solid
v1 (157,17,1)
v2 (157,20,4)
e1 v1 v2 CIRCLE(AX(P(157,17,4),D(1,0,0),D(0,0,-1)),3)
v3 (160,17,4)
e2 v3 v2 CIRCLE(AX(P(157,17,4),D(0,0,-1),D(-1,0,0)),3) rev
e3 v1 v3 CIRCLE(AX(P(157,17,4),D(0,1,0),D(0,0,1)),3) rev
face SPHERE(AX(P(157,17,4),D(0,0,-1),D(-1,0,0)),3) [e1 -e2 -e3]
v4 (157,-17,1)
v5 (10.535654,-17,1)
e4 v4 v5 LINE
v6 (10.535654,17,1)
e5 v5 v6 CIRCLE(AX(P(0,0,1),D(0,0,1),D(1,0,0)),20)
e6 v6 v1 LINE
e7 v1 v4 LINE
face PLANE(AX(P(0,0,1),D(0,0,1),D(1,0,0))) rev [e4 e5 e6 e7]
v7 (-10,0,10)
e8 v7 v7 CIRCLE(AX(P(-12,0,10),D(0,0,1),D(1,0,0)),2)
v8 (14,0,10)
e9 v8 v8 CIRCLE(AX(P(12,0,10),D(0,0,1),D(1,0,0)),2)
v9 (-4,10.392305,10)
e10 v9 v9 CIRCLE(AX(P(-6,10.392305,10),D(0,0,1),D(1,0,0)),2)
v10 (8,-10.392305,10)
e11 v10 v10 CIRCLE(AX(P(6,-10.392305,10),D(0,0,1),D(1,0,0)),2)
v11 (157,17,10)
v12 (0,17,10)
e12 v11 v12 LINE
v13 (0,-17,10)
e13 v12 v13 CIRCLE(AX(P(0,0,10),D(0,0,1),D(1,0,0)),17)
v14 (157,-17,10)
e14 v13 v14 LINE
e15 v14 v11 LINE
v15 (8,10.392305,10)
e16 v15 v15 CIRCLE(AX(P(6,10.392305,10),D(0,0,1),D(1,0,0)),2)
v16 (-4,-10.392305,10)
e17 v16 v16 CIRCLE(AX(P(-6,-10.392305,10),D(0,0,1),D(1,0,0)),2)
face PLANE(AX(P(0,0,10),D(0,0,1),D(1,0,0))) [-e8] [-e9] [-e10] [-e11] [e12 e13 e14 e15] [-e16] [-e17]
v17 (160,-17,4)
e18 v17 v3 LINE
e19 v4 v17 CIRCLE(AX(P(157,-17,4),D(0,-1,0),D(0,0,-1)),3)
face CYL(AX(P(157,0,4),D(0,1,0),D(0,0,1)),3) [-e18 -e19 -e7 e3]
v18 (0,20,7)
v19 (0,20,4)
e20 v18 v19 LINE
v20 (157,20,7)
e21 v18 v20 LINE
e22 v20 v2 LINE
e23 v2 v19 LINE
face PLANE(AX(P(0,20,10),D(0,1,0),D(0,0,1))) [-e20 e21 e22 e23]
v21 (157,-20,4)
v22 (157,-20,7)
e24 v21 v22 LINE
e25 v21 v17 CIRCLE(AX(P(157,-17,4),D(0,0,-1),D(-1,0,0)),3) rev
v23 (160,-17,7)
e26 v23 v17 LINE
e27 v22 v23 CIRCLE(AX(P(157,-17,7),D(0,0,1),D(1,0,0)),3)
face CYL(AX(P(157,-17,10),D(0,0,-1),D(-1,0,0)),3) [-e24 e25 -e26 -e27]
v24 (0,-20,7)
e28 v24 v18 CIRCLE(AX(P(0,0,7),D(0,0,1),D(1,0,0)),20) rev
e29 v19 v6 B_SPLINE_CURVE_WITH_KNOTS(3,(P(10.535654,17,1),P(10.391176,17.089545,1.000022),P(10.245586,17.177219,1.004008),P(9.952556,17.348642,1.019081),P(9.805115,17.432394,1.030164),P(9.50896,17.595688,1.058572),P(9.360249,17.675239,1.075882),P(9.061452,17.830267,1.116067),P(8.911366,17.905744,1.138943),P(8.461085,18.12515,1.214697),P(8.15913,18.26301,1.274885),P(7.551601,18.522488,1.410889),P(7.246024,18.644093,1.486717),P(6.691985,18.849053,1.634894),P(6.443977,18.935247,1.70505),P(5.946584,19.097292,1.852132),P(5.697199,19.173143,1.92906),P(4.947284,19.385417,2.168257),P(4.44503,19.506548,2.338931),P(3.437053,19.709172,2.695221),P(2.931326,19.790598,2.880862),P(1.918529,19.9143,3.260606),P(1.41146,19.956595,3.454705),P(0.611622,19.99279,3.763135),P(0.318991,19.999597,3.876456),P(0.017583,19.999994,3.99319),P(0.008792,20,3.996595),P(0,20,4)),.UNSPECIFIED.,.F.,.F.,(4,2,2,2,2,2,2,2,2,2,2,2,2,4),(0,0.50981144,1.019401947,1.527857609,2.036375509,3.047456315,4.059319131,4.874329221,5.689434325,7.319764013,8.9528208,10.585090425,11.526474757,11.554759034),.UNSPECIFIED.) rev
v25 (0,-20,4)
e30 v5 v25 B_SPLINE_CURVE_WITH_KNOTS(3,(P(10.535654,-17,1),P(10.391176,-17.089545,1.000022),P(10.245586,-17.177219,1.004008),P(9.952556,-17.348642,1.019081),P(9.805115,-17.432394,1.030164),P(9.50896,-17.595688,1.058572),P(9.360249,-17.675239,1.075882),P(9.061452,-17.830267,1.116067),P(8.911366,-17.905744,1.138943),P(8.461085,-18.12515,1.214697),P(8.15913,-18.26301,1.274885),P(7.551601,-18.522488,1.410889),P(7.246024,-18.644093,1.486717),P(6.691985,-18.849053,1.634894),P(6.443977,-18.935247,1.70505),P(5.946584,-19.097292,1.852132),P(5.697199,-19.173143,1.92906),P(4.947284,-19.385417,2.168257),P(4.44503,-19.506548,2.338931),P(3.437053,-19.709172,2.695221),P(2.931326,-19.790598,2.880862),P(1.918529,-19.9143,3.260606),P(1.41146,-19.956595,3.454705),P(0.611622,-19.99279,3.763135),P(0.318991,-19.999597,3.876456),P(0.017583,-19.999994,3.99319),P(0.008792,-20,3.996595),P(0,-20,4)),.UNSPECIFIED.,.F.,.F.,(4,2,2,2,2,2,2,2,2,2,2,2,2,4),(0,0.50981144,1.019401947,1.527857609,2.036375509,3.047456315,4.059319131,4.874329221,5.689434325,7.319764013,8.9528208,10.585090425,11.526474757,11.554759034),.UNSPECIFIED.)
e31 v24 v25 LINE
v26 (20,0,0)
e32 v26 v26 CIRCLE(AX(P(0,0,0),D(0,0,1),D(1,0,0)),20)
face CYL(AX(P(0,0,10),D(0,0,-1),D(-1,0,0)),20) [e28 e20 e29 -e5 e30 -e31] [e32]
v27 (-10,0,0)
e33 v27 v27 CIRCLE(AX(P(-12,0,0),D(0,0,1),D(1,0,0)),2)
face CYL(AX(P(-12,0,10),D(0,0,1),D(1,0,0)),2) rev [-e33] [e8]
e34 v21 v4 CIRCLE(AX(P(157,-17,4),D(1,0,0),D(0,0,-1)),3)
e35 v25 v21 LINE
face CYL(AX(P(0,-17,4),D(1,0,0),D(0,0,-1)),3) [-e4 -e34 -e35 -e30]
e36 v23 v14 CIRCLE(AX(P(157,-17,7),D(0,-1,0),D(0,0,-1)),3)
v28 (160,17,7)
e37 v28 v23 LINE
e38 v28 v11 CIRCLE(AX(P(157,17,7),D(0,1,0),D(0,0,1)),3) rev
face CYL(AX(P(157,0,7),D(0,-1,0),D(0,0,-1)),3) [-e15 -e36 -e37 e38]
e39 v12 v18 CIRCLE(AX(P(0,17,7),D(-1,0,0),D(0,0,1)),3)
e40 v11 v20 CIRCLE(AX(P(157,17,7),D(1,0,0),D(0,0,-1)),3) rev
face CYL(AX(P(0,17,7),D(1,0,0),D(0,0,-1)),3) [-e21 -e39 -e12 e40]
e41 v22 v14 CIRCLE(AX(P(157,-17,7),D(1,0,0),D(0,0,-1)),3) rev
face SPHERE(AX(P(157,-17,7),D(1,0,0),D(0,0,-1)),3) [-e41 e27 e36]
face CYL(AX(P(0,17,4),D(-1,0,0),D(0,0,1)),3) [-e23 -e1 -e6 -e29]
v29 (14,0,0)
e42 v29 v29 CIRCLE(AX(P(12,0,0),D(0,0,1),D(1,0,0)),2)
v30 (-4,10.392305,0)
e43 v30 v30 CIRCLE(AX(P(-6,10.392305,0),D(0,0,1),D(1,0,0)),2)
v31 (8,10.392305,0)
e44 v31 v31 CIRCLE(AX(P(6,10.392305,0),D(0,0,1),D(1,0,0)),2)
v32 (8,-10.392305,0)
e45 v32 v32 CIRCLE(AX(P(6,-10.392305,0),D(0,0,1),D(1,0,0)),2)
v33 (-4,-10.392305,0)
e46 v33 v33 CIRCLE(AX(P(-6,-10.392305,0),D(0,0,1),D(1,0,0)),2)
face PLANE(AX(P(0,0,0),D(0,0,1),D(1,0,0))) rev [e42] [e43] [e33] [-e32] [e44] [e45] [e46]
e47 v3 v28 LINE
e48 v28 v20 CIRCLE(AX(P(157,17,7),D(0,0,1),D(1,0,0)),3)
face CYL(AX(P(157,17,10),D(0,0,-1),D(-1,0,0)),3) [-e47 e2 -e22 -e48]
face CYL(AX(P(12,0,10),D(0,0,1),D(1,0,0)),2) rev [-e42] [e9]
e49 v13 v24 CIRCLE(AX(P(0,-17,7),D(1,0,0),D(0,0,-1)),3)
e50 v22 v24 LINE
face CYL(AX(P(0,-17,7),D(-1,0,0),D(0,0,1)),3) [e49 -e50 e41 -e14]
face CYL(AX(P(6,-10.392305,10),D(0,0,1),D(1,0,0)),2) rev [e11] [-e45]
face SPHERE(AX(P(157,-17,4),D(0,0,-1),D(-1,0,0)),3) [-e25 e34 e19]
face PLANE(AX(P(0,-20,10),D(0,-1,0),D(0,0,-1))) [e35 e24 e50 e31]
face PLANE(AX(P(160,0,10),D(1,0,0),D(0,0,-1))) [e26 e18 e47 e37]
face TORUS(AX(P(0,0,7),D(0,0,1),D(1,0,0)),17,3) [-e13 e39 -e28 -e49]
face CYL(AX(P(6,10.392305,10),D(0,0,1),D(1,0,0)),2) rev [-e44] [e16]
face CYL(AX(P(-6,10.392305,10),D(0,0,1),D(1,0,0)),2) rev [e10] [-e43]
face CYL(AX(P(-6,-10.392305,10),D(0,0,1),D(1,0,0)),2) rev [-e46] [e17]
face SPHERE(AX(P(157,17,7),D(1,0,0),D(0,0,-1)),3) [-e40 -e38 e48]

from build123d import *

# Parameters (mm, degrees)
SKETCH8_R             = 20
BOSS_EXTRUDE6_DEPTH   = 10
BOSS_EXTRUDE7_START   = 1
BOSS_EXTRUDE7_DEPTH   = 9
F_4_0MM_DOWEL_HOLE2_D = 4
FILLET4_R             = 3


with BuildPart() as part:
    # Sketch8 → Boss-Extrude6 (new body)
    with BuildSketch(Plane.XY):
        Circle(SKETCH8_R)
    extrude(amount=BOSS_EXTRUDE6_DEPTH)

    # Sketch8<4> → Boss-Extrude7 (add)
    with BuildSketch(Plane.XY.offset(BOSS_EXTRUDE7_START)):
        with BuildLine():
            Line((160, 20), (0, 20))
            ThreePointArc((0, 20), (14.142135624, 14.142135624), (20, 0))
            ThreePointArc((20, 0), (14.142135624, -14.142135624), (0, -20))
            Line((0, -20), (160, -20))
            Line((160, -20), (160, 20))
        make_face()
    extrude(amount=BOSS_EXTRUDE7_DEPTH)

    # Ø4.0mm Dowel Hole2 (through all)
    with Locations(Plane.XY.offset(10)):
        with Locations((6, 10.392304845), (12, 0), (6, -10.392304845), (-6, -10.392304845), (-12, 0), (-6, 10.392304845)):
            Hole(F_4_0MM_DOWEL_HOLE2_D / 2)

    # Fillet4
    # the kernel refuses this fillet: 3 mm, written as the material it takes off along each edge
    with BuildSketch(Plane(origin=(157, 17, 4), x_dir=(1, 0, 0), z_dir=(0, 0, -1))) as fillet4_piece_1_section:
        Polygon((0, 0), (FILLET4_R, 0), (FILLET4_R, -FILLET4_R), (0, -FILLET4_R), align=None)
    fillet4_piece_1 = extrude(amount=FILLET4_R, mode=Mode.PRIVATE)
    fillet4_piece_1 = fillet4_piece_1 - Plane(origin=(157, 17, 4), x_dir=(-0.7071067811865475, -0.7071067811865475, 0), z_dir=(0, 0, -1)) * Sphere(FILLET4_R, mode=Mode.PRIVATE)
    add(fillet4_piece_1, mode=Mode.SUBTRACT)
    with BuildSketch(Plane(origin=(157, 17, 7), x_dir=(1, 0, 0), z_dir=(0, 0, 1))) as fillet4_piece_2_section:
        Polygon((0, 0), (FILLET4_R, 0), (FILLET4_R, FILLET4_R), (0, FILLET4_R), align=None)
    fillet4_piece_2 = extrude(amount=FILLET4_R, mode=Mode.PRIVATE)
    fillet4_piece_2 = fillet4_piece_2 - Plane(origin=(157, 17, 7), x_dir=(-0.7071067811865475, -0.7071067811865475, 0), z_dir=(0, 0, 1)) * Sphere(FILLET4_R, mode=Mode.PRIVATE)
    add(fillet4_piece_2, mode=Mode.SUBTRACT)
    with BuildSketch(Plane(origin=(157, -17, 4), x_dir=(0, -1, 0), z_dir=(0, 0, -1))) as fillet4_piece_3_section:
        Polygon((0, 0), (FILLET4_R, 0), (FILLET4_R, -FILLET4_R), (0, -FILLET4_R), align=None)
    fillet4_piece_3 = extrude(amount=FILLET4_R, mode=Mode.PRIVATE)
    fillet4_piece_3 = fillet4_piece_3 - Plane(origin=(157, -17, 4), x_dir=(-0.7071067811865475, 0.7071067811865475, 0), z_dir=(0, 0, -1)) * Sphere(FILLET4_R, mode=Mode.PRIVATE)
    add(fillet4_piece_3, mode=Mode.SUBTRACT)
    with BuildSketch(Plane(origin=(157, -17, 7), x_dir=(0, 0, 1), z_dir=(0, -1, 0))) as fillet4_piece_4_section:
        Polygon((0, 0), (FILLET4_R, 0), (FILLET4_R, -FILLET4_R), (0, -FILLET4_R), align=None)
    fillet4_piece_4 = extrude(amount=FILLET4_R, mode=Mode.PRIVATE)
    fillet4_piece_4 = fillet4_piece_4 - Plane(origin=(157, -17, 7), x_dir=(-0.7071067811865475, 0, -0.7071067811865475), z_dir=(0, -1, 0)) * Sphere(FILLET4_R, mode=Mode.PRIVATE)
    add(fillet4_piece_4, mode=Mode.SUBTRACT)
    with BuildSketch(Plane(origin=(160, 20, 4), x_dir=(-1, 0, 0), z_dir=(0, 0, 1))) as fillet4_piece_5:
        with BuildLine():
            CenterArc((FILLET4_R, FILLET4_R), FILLET4_R, 180, 90)
            Line((0, FILLET4_R), (0, 0))
            Line((0, 0), (FILLET4_R, 0))
        make_face()
    extrude(amount=3, mode=Mode.SUBTRACT)
    with BuildSketch(Plane(origin=(157, 20, 1), x_dir=(0, -1, 0), z_dir=(-1, 0, 0))) as fillet4_piece_6_section:
        with BuildLine():
            CenterArc((FILLET4_R, FILLET4_R), FILLET4_R, 180, 90)
            Line((0, FILLET4_R), (0, 0))
            Line((0, 0), (FILLET4_R, 0))
        make_face()
    fillet4_piece_6 = extrude(amount=164.5, mode=Mode.PRIVATE)
    fillet4_piece_6 = fillet4_piece_6 - Plane(origin=(0, 0, 1.692410686), x_dir=(1, 0, 0), z_dir=(0, 0, -1)) * Cylinder(20, 341, mode=Mode.PRIVATE)
    add(fillet4_piece_6, mode=Mode.SUBTRACT)
    with BuildSketch(Plane(origin=(160, -17, 1), x_dir=(-1, 0, 0), z_dir=(0, 1, 0))) as fillet4_piece_7:
        with BuildLine():
            CenterArc((FILLET4_R, FILLET4_R), FILLET4_R, 180, 90)
            Line((0, FILLET4_R), (0, 0))
            Line((0, 0), (FILLET4_R, 0))
        make_face()
    extrude(amount=34, mode=Mode.SUBTRACT)
    with BuildSketch(Plane(origin=(-7.5, -20, 1), x_dir=(0, 1, 0), z_dir=(1, 0, 0))) as fillet4_piece_8_section:
        with BuildLine():
            CenterArc((FILLET4_R, FILLET4_R), FILLET4_R, 180, 90)
            Line((0, FILLET4_R), (0, 0))
            Line((0, 0), (FILLET4_R, 0))
        make_face()
    fillet4_piece_8 = extrude(amount=164.5, mode=Mode.PRIVATE)
    fillet4_piece_8 = fillet4_piece_8 - Plane(origin=(0, 0, 1.692408431), x_dir=(1, 0, 0), z_dir=(0, 0, -1)) * Cylinder(20, 341, mode=Mode.PRIVATE)
    add(fillet4_piece_8, mode=Mode.SUBTRACT)
    with BuildSketch(Plane(origin=(0, 0, 10), x_dir=(0, 1, 0), z_dir=(1, 0, 0))) as fillet4_piece_9:
        with BuildLine():
            CenterArc((20 - FILLET4_R, -FILLET4_R), FILLET4_R, 0, 90)
            Line((20 - FILLET4_R, 0), (20, 0))
            Line((20, 0), (20, -FILLET4_R))
        make_face()
    revolve(axis=Axis((0, 0, 10), (0, 0, 1)), revolution_arc=180, mode=Mode.SUBTRACT)
    with BuildSketch(Plane(origin=(0, -20, 10), x_dir=(0, 0, -1), z_dir=(1, 0, 0))) as fillet4_piece_10:
        with BuildLine():
            CenterArc((FILLET4_R, FILLET4_R), FILLET4_R, 180, 90)
            Line((0, FILLET4_R), (0, 0))
            Line((0, 0), (FILLET4_R, 0))
        make_face()
    extrude(amount=157, mode=Mode.SUBTRACT)
    with BuildSketch(Plane(origin=(160, -17, 10), x_dir=(-1, 0, 0), z_dir=(0, 1, 0))) as fillet4_piece_11:
        with BuildLine():
            CenterArc((FILLET4_R, -FILLET4_R), FILLET4_R, 90, 90)
            Line((0, -FILLET4_R), (0, 0))
            Line((0, 0), (FILLET4_R, 0))
        make_face()
    extrude(amount=34, mode=Mode.SUBTRACT)
    with BuildSketch(Plane(origin=(160, -20, 4), x_dir=(-1, 0, 0), z_dir=(0, 0, 1))) as fillet4_piece_12:
        with BuildLine():
            CenterArc((FILLET4_R, -FILLET4_R), FILLET4_R, 90, 90)
            Line((0, -FILLET4_R), (0, 0))
            Line((0, 0), (FILLET4_R, 0))
        make_face()
    extrude(amount=3, mode=Mode.SUBTRACT)
    with BuildSketch(Plane(origin=(157, 20, 10), x_dir=(0, -1, 0), z_dir=(-1, 0, 0))) as fillet4_piece_13:
        with BuildLine():
            CenterArc((FILLET4_R, -FILLET4_R), FILLET4_R, 90, 90)
            Line((0, -FILLET4_R), (0, 0))
            Line((0, 0), (FILLET4_R, 0))
        make_face()
    extrude(amount=157, mode=Mode.SUBTRACT)


solid = part.part
